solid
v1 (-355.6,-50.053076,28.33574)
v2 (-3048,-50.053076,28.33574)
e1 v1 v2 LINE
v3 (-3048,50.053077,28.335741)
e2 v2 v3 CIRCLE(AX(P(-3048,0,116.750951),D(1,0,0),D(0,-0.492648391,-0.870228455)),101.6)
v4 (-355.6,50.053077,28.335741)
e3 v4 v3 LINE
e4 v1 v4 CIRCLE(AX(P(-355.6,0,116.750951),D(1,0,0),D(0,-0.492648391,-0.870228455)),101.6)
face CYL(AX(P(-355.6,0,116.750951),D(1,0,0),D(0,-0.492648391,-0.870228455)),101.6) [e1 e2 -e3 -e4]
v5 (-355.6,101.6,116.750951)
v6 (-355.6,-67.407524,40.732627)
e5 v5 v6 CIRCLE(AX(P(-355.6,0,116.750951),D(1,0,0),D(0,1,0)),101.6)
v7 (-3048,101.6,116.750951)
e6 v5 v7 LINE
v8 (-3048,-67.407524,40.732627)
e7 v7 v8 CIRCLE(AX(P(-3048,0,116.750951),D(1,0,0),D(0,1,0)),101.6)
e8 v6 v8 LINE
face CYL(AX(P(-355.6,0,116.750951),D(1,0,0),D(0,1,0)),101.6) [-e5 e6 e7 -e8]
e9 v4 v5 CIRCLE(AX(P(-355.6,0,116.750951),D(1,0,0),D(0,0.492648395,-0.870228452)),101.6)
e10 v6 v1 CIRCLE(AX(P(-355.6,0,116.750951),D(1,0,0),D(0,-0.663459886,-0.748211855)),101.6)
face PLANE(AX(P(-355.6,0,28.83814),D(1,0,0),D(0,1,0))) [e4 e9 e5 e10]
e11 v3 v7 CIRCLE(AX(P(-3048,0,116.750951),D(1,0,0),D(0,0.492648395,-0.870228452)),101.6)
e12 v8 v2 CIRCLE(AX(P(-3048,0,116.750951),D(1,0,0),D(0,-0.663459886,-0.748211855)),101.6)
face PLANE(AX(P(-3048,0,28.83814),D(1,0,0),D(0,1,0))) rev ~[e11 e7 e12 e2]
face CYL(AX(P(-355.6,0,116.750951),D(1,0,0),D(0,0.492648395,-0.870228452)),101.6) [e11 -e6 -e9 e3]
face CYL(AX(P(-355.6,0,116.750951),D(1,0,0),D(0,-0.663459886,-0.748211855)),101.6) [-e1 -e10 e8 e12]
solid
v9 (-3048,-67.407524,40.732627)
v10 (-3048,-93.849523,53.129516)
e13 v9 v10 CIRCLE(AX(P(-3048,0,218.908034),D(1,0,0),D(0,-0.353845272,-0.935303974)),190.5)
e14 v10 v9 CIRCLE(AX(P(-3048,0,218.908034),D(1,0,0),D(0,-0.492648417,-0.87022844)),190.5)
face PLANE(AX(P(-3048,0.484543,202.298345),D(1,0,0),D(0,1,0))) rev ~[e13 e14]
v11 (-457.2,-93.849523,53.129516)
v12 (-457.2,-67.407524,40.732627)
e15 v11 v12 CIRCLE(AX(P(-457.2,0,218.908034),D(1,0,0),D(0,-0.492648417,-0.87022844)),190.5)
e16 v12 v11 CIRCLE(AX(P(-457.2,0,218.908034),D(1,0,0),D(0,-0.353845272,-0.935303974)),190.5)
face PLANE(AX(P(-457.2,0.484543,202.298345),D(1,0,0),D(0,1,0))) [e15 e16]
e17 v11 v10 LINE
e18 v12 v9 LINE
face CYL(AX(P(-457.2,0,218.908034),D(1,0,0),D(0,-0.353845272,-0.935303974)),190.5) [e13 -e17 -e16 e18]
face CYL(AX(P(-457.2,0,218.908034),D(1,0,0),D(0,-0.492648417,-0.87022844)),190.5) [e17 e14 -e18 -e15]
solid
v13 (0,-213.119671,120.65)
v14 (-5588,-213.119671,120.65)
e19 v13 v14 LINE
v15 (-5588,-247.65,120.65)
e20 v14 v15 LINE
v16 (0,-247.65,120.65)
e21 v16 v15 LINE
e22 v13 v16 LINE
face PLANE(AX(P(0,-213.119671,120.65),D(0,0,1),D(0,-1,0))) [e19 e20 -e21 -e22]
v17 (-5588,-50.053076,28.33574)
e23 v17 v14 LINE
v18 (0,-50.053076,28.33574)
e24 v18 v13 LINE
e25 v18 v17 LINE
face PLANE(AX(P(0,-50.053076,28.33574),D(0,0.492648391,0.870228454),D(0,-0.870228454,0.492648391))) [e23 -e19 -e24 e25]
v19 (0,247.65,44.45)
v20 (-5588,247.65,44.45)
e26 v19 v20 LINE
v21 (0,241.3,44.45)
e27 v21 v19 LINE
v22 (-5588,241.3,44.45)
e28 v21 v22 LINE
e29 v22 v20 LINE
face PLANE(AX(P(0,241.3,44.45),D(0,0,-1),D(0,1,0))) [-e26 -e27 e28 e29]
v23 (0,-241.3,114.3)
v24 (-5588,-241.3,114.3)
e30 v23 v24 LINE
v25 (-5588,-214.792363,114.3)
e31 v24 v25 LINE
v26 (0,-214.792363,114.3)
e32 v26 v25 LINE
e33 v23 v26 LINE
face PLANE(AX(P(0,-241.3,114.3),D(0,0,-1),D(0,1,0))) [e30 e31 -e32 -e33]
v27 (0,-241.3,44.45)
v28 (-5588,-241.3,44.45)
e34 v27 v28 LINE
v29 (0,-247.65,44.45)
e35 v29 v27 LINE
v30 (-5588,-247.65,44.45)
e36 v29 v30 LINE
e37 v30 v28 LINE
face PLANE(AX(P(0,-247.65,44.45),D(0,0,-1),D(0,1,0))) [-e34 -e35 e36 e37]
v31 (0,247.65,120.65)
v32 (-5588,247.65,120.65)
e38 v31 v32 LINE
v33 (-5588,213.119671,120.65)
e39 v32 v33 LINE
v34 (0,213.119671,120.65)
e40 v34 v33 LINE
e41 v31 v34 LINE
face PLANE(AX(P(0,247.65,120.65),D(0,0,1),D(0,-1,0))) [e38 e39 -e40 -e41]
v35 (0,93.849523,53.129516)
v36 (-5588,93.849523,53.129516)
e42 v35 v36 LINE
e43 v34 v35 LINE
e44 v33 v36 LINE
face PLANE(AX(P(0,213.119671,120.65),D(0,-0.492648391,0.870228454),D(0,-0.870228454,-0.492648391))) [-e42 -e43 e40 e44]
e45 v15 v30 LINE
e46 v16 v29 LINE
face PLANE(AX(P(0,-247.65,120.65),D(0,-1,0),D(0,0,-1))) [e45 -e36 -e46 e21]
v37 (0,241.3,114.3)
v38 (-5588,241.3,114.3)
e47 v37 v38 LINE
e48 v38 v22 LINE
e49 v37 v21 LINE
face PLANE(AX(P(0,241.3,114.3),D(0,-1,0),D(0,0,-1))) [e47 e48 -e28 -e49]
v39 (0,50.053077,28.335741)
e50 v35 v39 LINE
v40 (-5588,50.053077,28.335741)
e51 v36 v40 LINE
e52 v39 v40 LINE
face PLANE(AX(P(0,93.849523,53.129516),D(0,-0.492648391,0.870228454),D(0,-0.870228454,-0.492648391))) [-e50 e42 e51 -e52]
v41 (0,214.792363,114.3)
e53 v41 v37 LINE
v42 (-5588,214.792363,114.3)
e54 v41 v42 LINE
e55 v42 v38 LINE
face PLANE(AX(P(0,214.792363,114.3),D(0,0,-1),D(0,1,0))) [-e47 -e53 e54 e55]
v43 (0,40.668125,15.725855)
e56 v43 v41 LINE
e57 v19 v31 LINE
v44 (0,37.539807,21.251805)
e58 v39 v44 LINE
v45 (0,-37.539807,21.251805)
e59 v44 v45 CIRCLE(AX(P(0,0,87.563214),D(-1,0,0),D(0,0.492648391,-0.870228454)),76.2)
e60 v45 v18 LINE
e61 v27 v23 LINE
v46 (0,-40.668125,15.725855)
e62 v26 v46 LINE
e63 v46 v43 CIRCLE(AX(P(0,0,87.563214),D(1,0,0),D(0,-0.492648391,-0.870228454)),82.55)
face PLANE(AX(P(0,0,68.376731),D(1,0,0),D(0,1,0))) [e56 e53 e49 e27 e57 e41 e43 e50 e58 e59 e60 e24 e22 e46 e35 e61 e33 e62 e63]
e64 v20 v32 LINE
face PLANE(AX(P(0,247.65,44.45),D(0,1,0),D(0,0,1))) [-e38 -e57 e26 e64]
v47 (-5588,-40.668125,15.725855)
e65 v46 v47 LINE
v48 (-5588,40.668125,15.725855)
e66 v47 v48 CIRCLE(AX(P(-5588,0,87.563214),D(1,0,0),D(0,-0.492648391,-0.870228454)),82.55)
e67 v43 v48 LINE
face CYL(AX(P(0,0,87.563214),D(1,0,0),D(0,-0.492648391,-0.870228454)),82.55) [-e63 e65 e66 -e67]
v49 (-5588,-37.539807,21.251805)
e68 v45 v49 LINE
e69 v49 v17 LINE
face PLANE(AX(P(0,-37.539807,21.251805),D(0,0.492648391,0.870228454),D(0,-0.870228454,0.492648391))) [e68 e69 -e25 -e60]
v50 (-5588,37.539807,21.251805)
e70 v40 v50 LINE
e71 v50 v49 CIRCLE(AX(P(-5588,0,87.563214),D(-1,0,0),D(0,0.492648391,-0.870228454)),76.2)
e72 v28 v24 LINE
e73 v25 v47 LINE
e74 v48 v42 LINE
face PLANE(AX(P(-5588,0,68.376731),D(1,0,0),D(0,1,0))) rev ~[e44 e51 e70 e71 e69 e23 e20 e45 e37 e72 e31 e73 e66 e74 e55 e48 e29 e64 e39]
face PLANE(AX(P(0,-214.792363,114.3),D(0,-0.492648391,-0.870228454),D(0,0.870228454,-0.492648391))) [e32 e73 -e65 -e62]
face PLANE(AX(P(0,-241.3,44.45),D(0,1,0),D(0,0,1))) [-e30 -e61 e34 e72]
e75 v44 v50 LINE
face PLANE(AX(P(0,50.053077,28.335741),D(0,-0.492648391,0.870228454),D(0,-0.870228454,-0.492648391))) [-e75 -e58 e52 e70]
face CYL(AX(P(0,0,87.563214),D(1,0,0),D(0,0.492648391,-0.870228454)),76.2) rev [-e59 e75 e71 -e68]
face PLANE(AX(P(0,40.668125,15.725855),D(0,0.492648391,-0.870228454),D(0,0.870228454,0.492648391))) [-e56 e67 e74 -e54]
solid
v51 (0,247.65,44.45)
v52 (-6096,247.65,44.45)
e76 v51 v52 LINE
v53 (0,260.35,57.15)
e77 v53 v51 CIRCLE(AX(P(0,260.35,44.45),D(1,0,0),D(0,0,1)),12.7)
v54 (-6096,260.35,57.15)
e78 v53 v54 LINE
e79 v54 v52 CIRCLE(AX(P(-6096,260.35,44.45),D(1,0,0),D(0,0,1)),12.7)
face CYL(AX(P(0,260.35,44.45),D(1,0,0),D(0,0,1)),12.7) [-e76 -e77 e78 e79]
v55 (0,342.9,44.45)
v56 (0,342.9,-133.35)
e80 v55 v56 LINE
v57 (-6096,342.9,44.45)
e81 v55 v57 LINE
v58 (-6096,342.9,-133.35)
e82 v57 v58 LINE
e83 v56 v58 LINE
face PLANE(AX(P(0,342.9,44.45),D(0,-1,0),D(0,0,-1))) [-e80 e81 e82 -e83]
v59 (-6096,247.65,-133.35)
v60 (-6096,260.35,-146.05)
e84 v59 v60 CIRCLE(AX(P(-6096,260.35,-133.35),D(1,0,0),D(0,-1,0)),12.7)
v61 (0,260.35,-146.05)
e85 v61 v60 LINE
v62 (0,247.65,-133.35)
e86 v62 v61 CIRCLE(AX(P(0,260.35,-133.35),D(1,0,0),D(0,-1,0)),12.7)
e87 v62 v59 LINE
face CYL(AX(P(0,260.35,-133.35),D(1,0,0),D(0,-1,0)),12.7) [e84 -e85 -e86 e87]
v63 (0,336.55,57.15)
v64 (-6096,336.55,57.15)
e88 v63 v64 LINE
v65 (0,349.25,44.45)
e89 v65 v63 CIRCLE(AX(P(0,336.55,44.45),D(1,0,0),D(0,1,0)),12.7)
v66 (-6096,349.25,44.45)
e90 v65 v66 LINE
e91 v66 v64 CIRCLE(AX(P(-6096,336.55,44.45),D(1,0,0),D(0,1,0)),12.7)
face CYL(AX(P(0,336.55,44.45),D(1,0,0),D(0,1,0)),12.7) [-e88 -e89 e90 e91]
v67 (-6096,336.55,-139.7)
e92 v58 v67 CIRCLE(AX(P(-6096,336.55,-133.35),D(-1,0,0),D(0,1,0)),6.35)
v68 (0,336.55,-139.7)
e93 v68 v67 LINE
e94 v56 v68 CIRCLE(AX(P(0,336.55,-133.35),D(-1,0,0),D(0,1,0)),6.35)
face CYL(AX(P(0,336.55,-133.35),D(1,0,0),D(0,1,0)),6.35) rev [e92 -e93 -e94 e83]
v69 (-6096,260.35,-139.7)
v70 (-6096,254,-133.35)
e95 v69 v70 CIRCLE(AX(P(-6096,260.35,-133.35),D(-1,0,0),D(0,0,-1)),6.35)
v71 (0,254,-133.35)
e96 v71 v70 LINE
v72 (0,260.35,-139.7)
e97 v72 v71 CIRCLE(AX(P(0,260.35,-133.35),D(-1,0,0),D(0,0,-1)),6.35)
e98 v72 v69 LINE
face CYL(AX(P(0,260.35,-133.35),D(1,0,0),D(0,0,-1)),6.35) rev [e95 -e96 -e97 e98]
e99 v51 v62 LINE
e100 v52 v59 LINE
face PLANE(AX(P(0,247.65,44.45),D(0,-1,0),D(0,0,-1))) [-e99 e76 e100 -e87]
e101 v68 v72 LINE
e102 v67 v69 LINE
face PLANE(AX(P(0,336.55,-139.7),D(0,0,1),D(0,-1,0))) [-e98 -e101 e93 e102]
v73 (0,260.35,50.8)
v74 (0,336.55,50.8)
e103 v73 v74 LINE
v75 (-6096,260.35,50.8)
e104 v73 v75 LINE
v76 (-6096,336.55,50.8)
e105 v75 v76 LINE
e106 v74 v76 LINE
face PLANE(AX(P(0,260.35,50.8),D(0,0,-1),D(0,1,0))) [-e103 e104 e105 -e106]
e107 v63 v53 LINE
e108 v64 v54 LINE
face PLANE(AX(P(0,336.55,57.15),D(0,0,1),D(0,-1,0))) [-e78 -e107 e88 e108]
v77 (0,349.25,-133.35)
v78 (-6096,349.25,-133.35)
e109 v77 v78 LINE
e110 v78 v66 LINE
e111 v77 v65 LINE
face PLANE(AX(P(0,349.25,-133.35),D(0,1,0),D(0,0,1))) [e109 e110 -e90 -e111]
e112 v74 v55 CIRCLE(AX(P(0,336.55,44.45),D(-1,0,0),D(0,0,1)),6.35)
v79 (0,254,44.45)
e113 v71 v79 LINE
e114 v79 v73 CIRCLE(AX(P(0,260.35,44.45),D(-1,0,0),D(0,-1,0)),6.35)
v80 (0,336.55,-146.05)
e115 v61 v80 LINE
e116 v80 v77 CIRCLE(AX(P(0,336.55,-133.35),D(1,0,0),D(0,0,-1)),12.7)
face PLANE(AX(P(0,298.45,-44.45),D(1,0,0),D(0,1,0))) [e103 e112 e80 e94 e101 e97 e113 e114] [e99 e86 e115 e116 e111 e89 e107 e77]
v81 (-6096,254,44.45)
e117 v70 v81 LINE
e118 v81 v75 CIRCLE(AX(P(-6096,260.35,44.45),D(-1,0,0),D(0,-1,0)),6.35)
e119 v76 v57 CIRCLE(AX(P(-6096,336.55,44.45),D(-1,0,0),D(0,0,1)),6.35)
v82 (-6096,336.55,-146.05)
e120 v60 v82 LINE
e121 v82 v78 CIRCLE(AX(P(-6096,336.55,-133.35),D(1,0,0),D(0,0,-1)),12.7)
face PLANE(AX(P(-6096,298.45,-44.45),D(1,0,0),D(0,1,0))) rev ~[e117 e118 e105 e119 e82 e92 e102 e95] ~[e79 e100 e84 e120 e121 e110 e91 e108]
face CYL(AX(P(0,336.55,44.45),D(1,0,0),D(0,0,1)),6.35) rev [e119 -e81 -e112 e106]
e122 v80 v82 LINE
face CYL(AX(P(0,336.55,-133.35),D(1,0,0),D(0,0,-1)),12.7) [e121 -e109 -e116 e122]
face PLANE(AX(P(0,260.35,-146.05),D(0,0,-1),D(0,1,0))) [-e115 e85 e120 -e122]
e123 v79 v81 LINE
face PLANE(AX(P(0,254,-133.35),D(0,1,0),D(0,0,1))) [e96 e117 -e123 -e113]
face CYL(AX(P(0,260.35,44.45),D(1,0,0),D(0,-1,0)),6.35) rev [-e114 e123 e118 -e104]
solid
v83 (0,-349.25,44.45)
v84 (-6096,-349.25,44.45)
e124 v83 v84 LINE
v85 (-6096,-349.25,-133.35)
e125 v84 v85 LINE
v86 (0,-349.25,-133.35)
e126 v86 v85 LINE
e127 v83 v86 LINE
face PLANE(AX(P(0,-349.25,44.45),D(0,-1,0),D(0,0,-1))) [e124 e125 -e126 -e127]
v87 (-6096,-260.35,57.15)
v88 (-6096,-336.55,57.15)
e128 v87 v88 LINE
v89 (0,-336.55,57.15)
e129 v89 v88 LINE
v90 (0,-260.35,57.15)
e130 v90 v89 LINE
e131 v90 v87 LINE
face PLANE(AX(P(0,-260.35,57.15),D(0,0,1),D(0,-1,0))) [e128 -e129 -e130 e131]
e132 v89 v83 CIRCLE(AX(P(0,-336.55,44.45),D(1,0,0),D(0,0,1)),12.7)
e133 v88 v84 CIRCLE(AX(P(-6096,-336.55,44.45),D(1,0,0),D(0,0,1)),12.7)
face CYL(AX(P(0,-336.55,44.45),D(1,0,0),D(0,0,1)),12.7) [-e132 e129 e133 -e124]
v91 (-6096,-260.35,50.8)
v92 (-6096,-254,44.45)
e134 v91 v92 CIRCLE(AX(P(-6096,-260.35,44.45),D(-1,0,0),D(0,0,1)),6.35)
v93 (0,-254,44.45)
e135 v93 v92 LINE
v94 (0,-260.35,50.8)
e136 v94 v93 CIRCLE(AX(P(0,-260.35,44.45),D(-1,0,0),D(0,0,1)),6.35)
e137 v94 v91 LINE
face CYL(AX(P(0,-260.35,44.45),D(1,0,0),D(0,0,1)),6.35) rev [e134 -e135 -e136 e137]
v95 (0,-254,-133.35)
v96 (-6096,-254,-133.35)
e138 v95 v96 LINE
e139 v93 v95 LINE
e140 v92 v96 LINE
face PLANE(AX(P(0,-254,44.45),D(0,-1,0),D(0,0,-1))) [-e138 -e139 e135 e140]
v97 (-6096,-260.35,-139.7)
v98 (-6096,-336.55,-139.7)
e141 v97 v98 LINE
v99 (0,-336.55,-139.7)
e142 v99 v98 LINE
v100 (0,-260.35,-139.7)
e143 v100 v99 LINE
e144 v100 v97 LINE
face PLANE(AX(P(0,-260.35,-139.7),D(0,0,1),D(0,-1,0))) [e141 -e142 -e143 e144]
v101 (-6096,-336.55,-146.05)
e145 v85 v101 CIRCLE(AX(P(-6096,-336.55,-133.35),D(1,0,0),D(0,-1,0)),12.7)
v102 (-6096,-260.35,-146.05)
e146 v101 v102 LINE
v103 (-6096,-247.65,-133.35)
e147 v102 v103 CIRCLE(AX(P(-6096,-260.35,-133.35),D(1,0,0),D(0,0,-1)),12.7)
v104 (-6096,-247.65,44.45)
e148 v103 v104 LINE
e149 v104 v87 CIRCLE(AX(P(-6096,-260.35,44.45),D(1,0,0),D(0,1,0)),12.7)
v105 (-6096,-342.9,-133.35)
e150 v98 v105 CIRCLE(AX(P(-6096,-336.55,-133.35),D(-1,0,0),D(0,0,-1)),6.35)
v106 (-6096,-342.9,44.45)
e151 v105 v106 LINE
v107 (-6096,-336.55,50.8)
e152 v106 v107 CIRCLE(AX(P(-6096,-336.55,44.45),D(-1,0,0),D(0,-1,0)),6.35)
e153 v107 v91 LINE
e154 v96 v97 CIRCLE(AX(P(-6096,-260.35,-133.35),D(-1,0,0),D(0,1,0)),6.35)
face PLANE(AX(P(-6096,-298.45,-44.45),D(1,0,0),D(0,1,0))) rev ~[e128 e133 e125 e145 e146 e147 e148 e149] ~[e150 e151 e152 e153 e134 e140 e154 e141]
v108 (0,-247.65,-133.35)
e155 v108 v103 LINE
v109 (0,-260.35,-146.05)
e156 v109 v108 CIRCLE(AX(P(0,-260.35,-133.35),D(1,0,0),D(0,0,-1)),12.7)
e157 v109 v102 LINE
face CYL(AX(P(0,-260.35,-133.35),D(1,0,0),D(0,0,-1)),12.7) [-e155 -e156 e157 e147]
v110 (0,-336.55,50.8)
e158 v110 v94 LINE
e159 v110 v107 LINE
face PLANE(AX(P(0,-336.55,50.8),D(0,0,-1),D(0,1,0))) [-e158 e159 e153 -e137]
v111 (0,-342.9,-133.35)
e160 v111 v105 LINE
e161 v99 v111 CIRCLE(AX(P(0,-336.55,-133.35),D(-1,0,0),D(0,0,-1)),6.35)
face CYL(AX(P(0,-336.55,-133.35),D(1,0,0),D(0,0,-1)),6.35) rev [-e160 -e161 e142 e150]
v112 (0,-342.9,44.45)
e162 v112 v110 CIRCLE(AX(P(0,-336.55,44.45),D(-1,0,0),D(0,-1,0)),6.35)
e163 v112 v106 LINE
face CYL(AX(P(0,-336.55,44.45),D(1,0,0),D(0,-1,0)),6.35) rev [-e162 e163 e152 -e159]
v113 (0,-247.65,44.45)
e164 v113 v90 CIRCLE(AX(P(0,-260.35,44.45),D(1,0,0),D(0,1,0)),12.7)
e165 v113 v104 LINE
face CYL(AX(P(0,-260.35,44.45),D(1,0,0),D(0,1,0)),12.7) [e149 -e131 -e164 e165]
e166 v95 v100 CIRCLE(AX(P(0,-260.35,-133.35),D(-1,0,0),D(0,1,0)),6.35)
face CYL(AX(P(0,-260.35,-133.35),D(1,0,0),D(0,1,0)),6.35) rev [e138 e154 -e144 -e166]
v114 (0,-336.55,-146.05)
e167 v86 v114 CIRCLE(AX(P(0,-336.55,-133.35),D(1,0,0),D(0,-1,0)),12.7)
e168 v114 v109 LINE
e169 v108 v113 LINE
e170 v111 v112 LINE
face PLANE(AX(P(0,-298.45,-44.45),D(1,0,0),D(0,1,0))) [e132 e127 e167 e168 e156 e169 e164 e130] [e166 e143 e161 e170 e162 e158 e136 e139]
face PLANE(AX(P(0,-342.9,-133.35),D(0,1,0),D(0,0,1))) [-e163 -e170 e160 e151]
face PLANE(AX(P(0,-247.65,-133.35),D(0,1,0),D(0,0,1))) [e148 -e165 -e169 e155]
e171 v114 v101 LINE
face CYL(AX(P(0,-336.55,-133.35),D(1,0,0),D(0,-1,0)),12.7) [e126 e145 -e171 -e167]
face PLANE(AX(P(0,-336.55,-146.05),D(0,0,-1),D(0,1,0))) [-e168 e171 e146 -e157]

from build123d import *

# Parameters (mm, degrees)
F1_DEPTH = 6096
F2_DEPTH = 5588
F3_START = -355.6
F3_DEPTH = 2692.4
F4_START = -457.2
F4_DEPTH = 2590.8


# Not quite as in the source:
# - a feature names something its author has since deleted; it is built from what else it names


with BuildPart() as f1:
    # F0 (on Right) → F1 (new body)
    with BuildSketch(Plane.YZ):
        with BuildLine():
            Line((-278.751844046, 57.15), (-336.55, 57.15))
            ThreePointArc((-336.55, 57.15), (-345.5302561211, 53.4302561211), (-349.25, 44.45))
            Line((-349.25, 44.45), (-349.25, -133.35))
            ThreePointArc((-349.25, -133.35), (-345.5302561211, -142.3302561211), (-336.55, -146.05))
            Line((-336.55, -146.05), (-260.35, -146.05))
            ThreePointArc((-260.35, -146.05), (-251.3697438789, -142.3302561211), (-247.65, -133.35))
            Line((-247.65, -133.35), (-247.65, 44.45))
            ThreePointArc((-247.65, 44.45), (-251.3697438789, 53.4302561211), (-260.35, 57.15))
            Line((-260.35, 57.15), (-268.1402802436, 57.15))
            Line((-268.1402802436, 57.15), (-269.3472818438, 57.15))
            Line((-269.3472818438, 57.15), (-278.751844046, 57.15))
        make_face()
        with BuildLine():
            ThreePointArc((-342.9, 44.45), (-341.0401280605, 48.9401280605), (-336.55, 50.8))
            Line((-336.55, 50.8), (-260.35, 50.8))
            ThreePointArc((-260.35, 50.8), (-255.8598719395, 48.9401280605), (-254, 44.45))
            Line((-254, 44.45), (-254, -133.35))
            ThreePointArc((-254, -133.35), (-255.8598719395, -137.8401280605), (-260.35, -139.7))
            Line((-260.35, -139.7), (-336.55, -139.7))
            ThreePointArc((-336.55, -139.7), (-341.0401280605, -137.8401280605), (-342.9, -133.35))
            Line((-342.9, -133.35), (-342.9, 44.45))
        make_face(mode=Mode.SUBTRACT)
    extrude(amount=-F1_DEPTH)


with BuildPart() as f1b:
    # F0 (on Right) → F1, piece 2 (new body)
    with BuildSketch(Plane.YZ):
        with BuildLine():
            ThreePointArc((260.35, 57.15), (251.3697438789, 53.4302561211), (247.65, 44.45))
            Line((247.65, 44.45), (247.65, -133.35))
            ThreePointArc((247.65, -133.35), (251.3697438789, -142.3302561211), (260.35, -146.05))
            Line((260.35, -146.05), (336.55, -146.05))
            ThreePointArc((336.55, -146.05), (345.5302561211, -142.3302561211), (349.25, -133.35))
            Line((349.25, -133.35), (349.25, 44.45))
            ThreePointArc((349.25, 44.45), (345.5302561211, 53.4302561211), (336.55, 57.15))
            Line((336.55, 57.15), (260.35, 57.15))
        make_face()
        with BuildLine():
            Line((260.35, 50.8), (336.55, 50.8))
            ThreePointArc((336.55, 50.8), (341.0401280605, 48.9401280605), (342.9, 44.45))
            Line((342.9, 44.45), (342.9, -133.35))
            ThreePointArc((342.9, -133.35), (341.0401280605, -137.8401280605), (336.55, -139.7))
            Line((336.55, -139.7), (260.35, -139.7))
            ThreePointArc((260.35, -139.7), (255.8598719395, -137.8401280605), (254, -133.35))
            Line((254, -133.35), (254, 44.45))
            ThreePointArc((254, 44.45), (255.8598719395, 48.9401280605), (260.35, 50.8))
        make_face(mode=Mode.SUBTRACT)
    extrude(amount=-F1_DEPTH)


with BuildPart() as f2:
    # F0 (on Right) → F2 (new body)
    with BuildSketch(Plane.YZ):
        with BuildLine():
            Line((-247.65, 120.65), (-247.65, 44.45))
            Line((-247.65, 44.45), (-241.3, 44.45))
            Line((-241.3, 44.45), (-241.3, 114.3))
            Line((-241.3, 114.3), (-214.7923633436, 114.3))
            Line((-214.7923633436, 114.3), (-40.6681247176, 15.7258547021))
            ThreePointArc((-40.6681247176, 15.7258547021), (0, 5.0132135897), (40.6681247176, 15.7258547021))
            Line((40.6681247176, 15.7258547021), (214.7923633436, 114.3))
            Line((214.7923633436, 114.3), (241.3, 114.3))
            Line((241.3, 114.3), (241.3, 44.45))
            Line((241.3, 44.45), (247.65, 44.45))
            Line((247.65, 44.45), (247.65, 120.65))
            Line((247.65, 120.65), (213.1196707487, 120.65))
            Line((213.1196707487, 120.65), (93.8495232493, 53.1295161083))
            Line((93.8495232493, 53.1295161083), (50.0530768875, 28.3357406909))
            Line((50.0530768875, 28.3357406909), (37.5398074317, 21.2518053858))
            ThreePointArc((37.5398074317, 21.2518053858), (0, 11.3632135897), (-37.5398074317, 21.2518053858))
            Line((-37.5398074317, 21.2518053858), (-50.0530764944, 28.3357404684))
            Line((-50.0530764944, 28.3357404684), (-93.8495233688, 53.1295161759))
            Line((-93.8495233688, 53.1295161759), (-213.1196707487, 120.65))
            Line((-213.1196707487, 120.65), (-247.65, 120.65))
        make_face()
    extrude(amount=-F2_DEPTH)


with BuildPart() as f3:
    # F0 (on Right) → F3 (new body)
    with BuildSketch(Plane.YZ.offset(F3_START)):
        with BuildLine():
            ThreePointArc((-67.4075244001, 40.7326269894), (-59.0564889701, 34.0775511932), (-50.0530764944, 28.3357404684))
            ThreePointArc((-50.0530764944, 28.3357404684), (2.258e-07, 15.150951453), (50.0530768875, 28.3357406909))
            ThreePointArc((50.0530768875, 28.3357406909), (59.0564891539, 34.0775513244), (67.4075244001, 40.7326269894))
            ThreePointArc((67.4075244001, 40.7326269894), (0, 28.4080339743), (-67.4075244001, 40.7326269894))
        make_face()
        with BuildLine():
            ThreePointArc((101.6, 116.750951453), (-41.6770651615, 209.4093684453), (-67.4075244001, 40.7326269894))
            ThreePointArc((-67.4075244001, 40.7326269894), (0, 28.4080339743), (67.4075244001, 40.7326269894))
            ThreePointArc((67.4075244001, 40.7326269894), (92.6584169923, 75.0738862915), (101.6, 116.750951453))
        make_face()
    extrude(amount=-F3_DEPTH)


with BuildPart() as f4:
    # F0 (on Right) → F4 (new body)
    with BuildSketch(Plane.YZ.offset(F4_START)):
        with BuildLine():
            ThreePointArc((190.5, 218.9080339743), (-95.9476831358, 383.4810940446), (-93.8495233688, 53.1295161759))
            ThreePointArc((-93.8495233688, 53.1295161759), (-80.8664304836, 46.4236276622), (-67.4075244001, 40.7326269894))
            ThreePointArc((-67.4075244001, 40.7326269894), (-41.6770651615, 209.4093684453), (101.6, 116.750951453))
            ThreePointArc((101.6, 116.750951453), (92.6584169923, 75.0738862915), (67.4075244001, 40.7326269894))
            ThreePointArc((67.4075244001, 40.7326269894), (80.8664304214, 46.4236276331), (93.8495232493, 53.1295161083))
            ThreePointArc((93.8495232493, 53.1295161083), (164.5730600356, 122.9603507793), (190.5, 218.9080339743))
        make_face()
        with BuildLine():
            ThreePointArc((101.6, 116.750951453), (-41.6770651615, 209.4093684453), (-67.4075244001, 40.7326269894))
            ThreePointArc((-67.4075244001, 40.7326269894), (0, 28.4080339743), (67.4075244001, 40.7326269894))
            ThreePointArc((67.4075244001, 40.7326269894), (92.6584169923, 75.0738862915), (101.6, 116.750951453))
        make_face()
    extrude(amount=-F4_DEPTH)


solid = Compound([f1.part, f1b.part, f2.part, f3.part, f4.part])
